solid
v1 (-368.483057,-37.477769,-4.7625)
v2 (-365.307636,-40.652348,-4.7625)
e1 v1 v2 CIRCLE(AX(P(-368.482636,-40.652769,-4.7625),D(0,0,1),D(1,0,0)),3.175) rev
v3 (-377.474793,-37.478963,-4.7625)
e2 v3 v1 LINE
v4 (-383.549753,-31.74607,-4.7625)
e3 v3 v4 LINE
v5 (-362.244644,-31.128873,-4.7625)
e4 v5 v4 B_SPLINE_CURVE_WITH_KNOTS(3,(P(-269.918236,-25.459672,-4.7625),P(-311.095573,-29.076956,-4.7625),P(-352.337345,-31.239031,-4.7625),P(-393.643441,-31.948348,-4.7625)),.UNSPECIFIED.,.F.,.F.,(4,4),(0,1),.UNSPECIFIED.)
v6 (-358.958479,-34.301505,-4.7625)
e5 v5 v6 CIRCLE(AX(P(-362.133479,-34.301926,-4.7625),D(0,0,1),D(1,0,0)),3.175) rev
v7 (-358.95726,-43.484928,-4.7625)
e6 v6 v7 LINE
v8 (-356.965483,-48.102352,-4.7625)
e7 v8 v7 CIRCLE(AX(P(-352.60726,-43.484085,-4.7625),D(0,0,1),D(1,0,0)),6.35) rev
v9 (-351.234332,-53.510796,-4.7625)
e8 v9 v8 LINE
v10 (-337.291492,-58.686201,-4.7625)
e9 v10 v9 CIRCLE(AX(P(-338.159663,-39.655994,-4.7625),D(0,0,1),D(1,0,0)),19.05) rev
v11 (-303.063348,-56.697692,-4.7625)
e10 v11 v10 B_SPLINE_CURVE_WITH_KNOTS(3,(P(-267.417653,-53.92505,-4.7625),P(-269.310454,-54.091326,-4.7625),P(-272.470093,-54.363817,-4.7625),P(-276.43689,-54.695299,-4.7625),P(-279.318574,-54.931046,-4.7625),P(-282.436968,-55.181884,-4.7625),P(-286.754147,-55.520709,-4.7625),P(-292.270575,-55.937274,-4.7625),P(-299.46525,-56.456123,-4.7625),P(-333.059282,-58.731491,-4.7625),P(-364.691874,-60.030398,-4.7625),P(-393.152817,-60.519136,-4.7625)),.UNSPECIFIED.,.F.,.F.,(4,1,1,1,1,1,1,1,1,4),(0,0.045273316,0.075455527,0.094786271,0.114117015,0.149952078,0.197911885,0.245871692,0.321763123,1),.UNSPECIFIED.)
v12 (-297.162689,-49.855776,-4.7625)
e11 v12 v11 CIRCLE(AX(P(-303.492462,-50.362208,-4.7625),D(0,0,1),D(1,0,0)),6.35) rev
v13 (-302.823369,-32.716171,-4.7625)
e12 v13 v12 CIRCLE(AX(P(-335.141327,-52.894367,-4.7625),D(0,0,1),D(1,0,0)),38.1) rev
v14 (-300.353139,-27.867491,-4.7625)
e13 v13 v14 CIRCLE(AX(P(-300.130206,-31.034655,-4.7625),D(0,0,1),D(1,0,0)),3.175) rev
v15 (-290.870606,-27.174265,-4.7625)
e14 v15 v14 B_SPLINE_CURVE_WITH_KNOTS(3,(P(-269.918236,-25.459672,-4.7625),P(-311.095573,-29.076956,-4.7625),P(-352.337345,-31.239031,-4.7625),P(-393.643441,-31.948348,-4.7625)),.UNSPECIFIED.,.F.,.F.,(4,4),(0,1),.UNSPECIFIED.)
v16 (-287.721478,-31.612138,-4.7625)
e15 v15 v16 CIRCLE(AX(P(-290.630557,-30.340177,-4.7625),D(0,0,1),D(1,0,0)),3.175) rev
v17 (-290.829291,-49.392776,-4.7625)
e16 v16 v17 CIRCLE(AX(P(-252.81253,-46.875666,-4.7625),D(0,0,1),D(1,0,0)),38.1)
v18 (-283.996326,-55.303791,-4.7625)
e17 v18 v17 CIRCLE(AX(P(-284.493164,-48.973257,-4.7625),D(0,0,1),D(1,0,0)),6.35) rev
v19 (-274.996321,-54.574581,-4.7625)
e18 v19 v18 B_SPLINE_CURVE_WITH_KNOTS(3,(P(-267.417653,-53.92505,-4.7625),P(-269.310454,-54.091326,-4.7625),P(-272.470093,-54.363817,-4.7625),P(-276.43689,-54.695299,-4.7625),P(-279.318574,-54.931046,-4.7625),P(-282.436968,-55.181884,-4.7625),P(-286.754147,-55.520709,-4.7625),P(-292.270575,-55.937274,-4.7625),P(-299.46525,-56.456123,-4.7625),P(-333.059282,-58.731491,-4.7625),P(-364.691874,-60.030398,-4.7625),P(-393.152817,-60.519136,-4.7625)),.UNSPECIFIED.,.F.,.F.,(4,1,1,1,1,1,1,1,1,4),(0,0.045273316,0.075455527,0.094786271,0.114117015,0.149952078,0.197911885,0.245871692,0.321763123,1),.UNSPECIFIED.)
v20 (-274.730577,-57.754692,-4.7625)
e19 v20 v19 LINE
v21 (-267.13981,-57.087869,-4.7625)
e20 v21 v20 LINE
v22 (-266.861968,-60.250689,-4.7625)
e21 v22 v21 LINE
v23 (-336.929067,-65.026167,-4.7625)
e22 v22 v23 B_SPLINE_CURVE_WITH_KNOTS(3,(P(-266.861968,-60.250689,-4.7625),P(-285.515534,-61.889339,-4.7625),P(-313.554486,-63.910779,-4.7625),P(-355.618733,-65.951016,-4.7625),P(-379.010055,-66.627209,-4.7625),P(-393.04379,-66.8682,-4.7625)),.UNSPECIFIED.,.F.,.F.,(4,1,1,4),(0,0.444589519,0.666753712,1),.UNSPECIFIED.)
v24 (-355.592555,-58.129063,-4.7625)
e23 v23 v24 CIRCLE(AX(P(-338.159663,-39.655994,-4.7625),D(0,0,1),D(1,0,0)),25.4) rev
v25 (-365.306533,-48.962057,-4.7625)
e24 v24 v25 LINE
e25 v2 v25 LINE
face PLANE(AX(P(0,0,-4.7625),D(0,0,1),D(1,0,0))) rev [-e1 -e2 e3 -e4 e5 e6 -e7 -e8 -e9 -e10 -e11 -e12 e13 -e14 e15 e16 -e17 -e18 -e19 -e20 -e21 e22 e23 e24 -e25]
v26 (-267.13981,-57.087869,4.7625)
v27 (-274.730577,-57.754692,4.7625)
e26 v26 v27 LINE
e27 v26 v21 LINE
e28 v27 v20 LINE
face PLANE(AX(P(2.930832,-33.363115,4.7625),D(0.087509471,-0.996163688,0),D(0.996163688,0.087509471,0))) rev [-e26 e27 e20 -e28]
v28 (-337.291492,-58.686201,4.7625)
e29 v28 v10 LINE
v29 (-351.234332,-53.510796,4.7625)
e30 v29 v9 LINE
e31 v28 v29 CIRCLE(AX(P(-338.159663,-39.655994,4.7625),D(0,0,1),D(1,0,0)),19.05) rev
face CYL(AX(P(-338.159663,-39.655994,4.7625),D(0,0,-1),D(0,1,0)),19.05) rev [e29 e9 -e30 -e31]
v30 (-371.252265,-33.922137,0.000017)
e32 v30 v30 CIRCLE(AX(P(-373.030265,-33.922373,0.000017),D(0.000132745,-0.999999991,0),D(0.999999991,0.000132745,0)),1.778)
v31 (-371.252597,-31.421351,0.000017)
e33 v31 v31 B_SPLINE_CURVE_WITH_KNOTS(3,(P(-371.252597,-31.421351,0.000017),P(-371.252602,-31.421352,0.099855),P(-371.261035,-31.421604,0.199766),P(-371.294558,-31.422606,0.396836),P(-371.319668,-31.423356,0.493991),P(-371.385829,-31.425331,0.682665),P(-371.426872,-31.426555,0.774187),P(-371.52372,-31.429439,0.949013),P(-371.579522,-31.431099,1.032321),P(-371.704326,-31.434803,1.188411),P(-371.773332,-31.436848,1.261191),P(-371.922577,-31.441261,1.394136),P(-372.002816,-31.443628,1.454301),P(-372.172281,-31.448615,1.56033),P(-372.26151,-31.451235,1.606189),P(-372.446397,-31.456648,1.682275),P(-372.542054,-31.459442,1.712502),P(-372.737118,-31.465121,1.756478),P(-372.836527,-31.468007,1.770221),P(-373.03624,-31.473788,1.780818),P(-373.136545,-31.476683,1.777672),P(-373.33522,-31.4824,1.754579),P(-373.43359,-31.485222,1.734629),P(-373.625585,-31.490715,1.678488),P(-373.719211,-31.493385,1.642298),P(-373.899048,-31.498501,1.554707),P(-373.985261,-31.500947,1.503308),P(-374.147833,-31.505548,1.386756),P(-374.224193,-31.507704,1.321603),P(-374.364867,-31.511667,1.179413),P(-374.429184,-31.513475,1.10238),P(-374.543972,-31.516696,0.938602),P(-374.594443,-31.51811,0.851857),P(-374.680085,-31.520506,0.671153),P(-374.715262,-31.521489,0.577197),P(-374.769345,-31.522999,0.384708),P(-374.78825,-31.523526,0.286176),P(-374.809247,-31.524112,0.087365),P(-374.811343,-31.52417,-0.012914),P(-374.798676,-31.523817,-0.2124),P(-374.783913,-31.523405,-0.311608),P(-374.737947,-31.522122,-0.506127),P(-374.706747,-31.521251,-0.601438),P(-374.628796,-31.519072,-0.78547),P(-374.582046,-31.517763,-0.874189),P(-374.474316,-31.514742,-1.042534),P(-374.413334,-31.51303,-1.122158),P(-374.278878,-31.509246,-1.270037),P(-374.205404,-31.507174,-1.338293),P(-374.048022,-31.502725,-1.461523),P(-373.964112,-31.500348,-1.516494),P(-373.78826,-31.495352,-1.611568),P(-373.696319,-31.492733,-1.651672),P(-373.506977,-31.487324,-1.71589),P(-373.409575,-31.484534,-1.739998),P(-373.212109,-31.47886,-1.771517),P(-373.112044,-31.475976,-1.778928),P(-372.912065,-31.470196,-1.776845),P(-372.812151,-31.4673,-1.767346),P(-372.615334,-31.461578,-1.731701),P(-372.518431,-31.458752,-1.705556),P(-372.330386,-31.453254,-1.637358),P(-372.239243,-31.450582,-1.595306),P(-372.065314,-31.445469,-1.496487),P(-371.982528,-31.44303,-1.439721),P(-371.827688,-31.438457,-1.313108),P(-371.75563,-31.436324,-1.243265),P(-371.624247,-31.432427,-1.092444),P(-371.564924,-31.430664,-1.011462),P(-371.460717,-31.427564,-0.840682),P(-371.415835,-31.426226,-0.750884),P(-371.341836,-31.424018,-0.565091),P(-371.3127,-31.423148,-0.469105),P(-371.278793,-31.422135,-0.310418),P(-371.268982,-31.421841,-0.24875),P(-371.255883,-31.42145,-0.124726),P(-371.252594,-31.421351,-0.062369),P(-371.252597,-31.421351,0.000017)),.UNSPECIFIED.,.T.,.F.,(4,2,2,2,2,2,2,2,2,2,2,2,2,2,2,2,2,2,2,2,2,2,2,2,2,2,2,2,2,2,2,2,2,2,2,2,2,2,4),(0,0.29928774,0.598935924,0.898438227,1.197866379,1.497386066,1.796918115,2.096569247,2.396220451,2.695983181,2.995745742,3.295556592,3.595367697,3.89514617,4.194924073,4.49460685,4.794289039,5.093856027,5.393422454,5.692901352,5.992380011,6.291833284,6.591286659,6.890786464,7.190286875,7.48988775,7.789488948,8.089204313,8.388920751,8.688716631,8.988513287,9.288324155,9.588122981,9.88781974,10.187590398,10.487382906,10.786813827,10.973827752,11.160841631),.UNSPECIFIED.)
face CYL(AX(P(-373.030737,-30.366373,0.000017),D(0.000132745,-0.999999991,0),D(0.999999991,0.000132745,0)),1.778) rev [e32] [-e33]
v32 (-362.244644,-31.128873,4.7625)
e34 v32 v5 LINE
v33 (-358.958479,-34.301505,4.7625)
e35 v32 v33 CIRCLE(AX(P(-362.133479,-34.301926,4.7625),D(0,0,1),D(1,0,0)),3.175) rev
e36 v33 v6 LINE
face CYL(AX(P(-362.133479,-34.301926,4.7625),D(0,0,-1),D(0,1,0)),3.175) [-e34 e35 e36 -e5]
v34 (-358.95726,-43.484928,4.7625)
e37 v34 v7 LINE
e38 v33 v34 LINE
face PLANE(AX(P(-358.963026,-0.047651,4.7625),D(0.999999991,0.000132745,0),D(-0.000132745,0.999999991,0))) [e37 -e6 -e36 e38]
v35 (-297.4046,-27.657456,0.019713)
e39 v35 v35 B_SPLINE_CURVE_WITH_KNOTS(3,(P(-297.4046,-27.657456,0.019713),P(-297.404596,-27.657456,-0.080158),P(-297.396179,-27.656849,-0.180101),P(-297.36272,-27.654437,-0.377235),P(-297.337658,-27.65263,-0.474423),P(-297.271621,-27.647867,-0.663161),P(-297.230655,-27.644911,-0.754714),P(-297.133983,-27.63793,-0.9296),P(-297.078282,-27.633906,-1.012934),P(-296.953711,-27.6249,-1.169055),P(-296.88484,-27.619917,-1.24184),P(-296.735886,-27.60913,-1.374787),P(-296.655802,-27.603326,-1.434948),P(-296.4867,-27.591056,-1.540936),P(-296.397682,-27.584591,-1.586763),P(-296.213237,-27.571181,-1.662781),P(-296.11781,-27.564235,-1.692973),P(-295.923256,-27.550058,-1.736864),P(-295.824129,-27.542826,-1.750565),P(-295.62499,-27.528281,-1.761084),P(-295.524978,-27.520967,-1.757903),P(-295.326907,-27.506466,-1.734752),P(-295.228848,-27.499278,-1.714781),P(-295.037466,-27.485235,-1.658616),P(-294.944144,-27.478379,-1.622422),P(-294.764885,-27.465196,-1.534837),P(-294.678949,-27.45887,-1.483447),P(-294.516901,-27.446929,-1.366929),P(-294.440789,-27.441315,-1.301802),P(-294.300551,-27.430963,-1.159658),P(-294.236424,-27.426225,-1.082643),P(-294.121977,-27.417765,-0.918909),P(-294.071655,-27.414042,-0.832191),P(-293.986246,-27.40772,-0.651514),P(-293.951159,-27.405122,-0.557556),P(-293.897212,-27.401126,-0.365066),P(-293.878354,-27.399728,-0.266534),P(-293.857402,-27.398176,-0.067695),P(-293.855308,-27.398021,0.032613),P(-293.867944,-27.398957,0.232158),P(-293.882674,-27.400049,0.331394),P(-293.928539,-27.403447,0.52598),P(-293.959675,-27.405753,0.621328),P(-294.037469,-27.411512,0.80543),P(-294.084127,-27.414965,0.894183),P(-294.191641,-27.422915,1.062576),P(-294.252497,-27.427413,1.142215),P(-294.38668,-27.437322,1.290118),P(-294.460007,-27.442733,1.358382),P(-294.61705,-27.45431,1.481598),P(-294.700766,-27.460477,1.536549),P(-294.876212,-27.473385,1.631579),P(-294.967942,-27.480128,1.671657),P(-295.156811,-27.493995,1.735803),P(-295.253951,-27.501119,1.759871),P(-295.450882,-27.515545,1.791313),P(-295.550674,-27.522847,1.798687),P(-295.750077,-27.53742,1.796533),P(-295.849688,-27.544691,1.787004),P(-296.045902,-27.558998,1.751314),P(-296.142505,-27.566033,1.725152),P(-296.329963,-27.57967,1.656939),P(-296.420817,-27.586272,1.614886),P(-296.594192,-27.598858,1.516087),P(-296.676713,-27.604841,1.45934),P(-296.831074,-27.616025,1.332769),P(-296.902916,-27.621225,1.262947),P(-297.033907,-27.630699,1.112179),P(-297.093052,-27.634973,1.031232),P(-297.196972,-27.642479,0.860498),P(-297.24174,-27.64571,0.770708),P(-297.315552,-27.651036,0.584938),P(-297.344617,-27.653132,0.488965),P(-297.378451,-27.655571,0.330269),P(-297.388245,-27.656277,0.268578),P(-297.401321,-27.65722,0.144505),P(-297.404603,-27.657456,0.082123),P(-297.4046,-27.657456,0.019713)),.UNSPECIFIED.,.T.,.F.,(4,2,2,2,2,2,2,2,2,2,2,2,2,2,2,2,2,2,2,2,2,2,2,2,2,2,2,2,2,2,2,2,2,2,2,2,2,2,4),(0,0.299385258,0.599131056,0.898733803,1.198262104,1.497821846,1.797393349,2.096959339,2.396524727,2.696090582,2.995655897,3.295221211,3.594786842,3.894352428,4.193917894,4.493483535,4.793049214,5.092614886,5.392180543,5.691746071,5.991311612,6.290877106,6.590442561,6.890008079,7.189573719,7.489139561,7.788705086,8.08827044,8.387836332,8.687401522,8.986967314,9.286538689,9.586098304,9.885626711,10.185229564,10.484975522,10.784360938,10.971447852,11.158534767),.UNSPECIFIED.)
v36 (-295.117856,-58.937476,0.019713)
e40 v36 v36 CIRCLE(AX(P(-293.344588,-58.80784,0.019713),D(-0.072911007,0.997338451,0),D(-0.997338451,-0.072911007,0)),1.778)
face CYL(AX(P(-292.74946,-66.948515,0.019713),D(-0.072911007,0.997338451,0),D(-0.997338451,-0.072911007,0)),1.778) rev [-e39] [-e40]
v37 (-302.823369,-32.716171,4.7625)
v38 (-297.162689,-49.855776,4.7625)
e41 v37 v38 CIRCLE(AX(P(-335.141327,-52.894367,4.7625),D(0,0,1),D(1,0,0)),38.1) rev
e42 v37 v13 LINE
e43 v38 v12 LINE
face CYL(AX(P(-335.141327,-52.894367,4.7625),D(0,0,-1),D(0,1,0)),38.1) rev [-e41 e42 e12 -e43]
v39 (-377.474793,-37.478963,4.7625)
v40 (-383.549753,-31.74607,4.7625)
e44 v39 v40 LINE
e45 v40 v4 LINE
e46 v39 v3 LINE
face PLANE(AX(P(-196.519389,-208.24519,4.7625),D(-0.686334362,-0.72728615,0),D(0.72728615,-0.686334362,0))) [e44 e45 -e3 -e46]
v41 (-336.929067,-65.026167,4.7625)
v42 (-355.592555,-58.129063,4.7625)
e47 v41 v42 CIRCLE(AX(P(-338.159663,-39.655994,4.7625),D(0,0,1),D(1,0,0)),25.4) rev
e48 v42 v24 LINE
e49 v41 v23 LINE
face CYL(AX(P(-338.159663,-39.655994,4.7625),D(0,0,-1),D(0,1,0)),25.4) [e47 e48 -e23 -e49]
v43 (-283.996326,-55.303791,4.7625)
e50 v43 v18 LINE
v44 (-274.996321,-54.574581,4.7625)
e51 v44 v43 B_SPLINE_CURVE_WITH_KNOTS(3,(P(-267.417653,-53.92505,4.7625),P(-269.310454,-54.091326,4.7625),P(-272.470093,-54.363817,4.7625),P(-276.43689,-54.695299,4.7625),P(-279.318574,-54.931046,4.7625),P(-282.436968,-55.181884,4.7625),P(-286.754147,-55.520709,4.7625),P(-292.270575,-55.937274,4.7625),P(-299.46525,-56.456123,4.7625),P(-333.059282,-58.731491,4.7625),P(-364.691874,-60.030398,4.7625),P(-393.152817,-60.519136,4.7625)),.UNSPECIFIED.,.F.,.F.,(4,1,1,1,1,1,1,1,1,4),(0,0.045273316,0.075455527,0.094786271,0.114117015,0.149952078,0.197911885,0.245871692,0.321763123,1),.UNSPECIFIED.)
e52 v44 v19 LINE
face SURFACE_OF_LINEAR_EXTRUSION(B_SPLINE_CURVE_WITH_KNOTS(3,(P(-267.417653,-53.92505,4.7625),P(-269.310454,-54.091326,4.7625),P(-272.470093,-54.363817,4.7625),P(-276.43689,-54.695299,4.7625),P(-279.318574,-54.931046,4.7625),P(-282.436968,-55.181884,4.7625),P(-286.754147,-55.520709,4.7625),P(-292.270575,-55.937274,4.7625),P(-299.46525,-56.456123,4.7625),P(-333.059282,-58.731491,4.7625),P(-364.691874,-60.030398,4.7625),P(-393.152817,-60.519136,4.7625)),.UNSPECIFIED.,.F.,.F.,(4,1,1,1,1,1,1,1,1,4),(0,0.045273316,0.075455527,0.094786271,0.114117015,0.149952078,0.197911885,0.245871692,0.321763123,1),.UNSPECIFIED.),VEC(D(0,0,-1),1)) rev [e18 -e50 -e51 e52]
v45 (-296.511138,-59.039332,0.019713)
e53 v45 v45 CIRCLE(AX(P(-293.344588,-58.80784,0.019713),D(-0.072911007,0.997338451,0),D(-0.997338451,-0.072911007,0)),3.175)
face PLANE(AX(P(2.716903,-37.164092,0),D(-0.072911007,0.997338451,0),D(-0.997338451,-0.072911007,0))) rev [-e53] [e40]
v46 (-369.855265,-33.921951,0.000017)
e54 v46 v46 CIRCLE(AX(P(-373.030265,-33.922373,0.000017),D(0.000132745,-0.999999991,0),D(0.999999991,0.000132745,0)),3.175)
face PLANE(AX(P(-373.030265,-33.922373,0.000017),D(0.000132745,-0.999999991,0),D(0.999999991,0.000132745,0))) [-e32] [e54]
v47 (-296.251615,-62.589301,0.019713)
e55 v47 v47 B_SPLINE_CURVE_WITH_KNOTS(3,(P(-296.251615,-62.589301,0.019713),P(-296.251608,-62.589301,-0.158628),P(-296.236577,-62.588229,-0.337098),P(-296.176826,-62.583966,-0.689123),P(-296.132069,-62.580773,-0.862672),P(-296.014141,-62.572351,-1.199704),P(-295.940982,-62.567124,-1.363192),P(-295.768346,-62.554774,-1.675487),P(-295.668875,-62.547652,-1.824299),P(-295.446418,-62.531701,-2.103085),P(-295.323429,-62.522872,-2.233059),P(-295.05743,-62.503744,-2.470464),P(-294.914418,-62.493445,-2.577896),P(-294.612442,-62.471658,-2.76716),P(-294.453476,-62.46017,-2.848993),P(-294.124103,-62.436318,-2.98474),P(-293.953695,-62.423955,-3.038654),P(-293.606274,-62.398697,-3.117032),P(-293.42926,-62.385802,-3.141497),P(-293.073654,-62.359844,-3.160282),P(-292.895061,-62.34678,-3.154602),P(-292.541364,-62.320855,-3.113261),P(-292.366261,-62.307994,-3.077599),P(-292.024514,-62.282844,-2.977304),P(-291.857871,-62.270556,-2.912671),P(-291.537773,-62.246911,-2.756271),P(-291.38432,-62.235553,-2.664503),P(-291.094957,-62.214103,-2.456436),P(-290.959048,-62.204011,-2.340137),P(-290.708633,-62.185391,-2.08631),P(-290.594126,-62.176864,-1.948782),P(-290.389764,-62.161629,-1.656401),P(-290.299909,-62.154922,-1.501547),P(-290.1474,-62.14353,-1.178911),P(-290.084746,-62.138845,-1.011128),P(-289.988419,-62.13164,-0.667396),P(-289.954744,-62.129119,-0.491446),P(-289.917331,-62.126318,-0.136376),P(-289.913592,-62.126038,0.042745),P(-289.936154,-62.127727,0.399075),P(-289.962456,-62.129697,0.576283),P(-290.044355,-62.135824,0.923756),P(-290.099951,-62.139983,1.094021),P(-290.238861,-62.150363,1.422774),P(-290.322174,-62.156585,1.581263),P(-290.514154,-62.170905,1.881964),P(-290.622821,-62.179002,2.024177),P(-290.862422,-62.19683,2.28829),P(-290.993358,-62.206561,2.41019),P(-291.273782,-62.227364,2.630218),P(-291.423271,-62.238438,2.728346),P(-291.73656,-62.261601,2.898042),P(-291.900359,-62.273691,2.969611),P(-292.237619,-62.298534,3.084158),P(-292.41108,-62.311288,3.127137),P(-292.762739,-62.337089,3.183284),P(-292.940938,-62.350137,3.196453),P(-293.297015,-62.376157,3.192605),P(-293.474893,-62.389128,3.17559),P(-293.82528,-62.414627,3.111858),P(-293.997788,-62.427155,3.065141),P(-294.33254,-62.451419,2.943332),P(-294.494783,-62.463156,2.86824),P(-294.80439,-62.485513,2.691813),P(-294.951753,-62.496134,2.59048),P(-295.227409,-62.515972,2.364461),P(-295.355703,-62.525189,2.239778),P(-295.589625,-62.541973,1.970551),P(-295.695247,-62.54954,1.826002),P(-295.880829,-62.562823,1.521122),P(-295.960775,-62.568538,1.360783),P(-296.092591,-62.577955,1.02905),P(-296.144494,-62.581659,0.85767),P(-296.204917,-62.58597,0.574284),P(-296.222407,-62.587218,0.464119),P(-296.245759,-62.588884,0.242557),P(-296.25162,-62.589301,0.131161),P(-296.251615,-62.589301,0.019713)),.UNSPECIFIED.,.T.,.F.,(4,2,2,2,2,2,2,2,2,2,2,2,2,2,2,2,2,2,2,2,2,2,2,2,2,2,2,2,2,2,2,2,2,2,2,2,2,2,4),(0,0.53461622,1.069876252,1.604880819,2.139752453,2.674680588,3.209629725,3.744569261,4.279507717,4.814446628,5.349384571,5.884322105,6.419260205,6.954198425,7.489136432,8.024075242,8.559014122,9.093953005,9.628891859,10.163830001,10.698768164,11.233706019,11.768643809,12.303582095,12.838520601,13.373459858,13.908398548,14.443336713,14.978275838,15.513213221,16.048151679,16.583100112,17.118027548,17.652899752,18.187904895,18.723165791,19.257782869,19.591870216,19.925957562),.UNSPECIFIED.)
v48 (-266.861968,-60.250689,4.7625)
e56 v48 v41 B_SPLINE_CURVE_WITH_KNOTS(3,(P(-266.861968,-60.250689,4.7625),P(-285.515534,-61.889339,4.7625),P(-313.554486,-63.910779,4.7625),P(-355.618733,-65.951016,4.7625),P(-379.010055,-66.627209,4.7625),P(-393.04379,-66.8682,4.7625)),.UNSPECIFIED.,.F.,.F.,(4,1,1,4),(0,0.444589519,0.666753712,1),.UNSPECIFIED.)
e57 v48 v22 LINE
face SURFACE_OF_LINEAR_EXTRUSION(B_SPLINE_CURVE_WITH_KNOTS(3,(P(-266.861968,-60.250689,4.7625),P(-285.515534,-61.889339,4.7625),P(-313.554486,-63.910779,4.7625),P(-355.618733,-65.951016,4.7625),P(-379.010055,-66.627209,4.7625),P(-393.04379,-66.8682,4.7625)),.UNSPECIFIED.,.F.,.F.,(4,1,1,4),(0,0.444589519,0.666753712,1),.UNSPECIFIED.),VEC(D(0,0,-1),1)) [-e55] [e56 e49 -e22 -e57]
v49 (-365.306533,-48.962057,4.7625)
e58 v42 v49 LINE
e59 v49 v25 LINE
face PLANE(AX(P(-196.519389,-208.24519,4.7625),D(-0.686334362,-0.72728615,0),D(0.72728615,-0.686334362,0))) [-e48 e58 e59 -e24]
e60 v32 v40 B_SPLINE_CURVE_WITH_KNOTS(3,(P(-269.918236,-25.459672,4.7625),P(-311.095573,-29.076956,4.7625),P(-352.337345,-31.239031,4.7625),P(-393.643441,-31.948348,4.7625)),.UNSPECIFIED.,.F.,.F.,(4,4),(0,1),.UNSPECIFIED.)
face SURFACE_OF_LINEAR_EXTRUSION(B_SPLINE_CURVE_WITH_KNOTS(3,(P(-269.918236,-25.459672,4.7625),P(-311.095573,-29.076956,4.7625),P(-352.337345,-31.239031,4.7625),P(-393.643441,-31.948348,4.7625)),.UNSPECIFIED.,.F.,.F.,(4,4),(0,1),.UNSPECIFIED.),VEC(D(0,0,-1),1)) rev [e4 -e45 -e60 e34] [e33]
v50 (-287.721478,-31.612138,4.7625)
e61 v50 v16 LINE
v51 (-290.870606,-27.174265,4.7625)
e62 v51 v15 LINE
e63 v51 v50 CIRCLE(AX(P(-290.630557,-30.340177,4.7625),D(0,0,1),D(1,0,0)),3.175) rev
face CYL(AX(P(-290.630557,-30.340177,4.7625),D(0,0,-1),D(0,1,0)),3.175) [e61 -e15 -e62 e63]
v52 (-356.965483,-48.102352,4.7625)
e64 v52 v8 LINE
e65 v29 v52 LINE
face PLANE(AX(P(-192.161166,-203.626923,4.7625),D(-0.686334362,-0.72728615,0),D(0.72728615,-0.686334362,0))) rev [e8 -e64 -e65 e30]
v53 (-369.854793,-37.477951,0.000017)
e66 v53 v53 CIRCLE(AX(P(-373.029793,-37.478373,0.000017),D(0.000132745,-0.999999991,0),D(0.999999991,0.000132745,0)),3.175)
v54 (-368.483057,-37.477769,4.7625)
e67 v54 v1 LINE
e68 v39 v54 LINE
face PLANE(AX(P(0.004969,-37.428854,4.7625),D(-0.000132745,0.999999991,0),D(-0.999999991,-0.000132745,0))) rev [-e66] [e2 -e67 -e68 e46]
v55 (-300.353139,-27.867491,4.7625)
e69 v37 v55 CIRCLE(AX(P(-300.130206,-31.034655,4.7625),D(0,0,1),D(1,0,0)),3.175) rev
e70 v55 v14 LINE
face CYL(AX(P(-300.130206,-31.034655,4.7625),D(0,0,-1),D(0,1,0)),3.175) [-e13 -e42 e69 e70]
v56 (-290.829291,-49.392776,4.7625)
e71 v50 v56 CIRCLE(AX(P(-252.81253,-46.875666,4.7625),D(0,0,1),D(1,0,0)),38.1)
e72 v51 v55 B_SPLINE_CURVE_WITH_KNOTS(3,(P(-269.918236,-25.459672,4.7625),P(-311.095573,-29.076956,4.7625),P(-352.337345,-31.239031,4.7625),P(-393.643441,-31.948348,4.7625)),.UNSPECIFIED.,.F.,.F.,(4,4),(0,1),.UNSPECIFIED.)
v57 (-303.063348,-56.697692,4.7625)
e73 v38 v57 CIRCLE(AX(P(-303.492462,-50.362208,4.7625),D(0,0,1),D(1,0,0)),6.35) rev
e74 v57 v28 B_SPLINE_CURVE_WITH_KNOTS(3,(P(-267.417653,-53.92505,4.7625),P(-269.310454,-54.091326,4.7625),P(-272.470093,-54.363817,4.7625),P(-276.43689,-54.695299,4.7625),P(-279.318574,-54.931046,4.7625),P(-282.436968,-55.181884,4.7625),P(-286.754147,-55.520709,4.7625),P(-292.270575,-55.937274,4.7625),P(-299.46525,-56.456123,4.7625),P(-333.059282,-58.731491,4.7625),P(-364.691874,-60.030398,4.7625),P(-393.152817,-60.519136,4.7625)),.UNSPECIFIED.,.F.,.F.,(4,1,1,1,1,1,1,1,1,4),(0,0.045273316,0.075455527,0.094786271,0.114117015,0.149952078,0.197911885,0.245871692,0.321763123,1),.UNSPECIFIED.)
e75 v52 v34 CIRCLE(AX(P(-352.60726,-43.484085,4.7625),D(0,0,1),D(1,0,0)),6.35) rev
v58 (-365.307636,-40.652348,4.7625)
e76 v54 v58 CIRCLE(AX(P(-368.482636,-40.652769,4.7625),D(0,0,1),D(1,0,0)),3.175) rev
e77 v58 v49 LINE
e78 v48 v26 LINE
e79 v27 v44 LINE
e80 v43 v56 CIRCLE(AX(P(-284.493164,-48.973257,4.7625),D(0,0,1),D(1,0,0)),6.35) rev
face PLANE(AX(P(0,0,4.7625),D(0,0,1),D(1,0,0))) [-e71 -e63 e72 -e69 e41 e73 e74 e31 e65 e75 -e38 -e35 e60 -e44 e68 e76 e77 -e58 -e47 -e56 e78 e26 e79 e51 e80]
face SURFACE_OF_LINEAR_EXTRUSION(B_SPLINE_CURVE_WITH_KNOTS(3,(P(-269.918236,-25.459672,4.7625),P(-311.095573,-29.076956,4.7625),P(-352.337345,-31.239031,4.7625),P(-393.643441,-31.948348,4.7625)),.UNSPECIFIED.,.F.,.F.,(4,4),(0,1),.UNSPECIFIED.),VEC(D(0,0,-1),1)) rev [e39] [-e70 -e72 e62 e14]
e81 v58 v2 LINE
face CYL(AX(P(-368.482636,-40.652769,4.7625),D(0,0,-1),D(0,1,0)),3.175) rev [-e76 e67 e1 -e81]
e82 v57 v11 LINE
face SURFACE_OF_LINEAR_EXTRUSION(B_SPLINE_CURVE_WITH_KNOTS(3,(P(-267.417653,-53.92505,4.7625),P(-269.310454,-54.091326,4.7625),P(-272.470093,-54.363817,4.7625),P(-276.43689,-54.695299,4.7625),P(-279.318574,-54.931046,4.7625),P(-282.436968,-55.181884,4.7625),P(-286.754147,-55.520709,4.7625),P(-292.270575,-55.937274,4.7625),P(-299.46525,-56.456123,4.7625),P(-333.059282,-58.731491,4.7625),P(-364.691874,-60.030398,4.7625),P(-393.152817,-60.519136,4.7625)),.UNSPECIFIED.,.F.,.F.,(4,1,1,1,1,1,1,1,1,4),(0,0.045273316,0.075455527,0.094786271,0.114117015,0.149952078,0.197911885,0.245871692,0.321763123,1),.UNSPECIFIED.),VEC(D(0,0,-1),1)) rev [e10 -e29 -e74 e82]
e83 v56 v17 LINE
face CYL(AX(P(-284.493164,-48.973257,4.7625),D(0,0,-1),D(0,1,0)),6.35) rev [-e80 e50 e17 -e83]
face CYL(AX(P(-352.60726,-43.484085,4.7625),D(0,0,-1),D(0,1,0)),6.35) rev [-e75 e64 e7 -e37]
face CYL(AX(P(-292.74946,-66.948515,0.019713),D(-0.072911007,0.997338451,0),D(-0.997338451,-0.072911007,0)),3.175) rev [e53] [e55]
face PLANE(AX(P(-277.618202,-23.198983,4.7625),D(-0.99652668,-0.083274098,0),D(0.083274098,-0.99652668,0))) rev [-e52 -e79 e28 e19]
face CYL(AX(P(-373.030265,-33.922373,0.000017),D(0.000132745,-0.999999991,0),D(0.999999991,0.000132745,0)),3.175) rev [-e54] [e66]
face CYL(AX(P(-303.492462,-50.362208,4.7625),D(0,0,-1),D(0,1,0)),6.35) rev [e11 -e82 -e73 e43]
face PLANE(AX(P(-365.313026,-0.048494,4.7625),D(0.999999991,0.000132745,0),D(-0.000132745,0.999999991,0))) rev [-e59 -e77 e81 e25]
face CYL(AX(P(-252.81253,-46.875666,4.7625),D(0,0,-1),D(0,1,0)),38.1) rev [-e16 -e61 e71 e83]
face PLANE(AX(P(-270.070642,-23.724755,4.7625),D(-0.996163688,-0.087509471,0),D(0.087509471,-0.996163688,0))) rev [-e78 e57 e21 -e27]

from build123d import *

# Parameters (mm, degrees)
BOSS_EXTRUDE1_START     = -4.7625
BOSS_EXTRUDE1_DEPTH     = 9.525
SKETCH4_R               = 3.175
CUT_EXTRUDE1_DEPTH      = 3.556
SKETCH5_R               = 1.778
CUT_EXTRUDE2_DEPTH      = 3.556
SKETCH6_R               = 1.778
CUT_EXTRUDE3_DEPTH      = 389.542033304
CUT_EXTRUDE4_DEPTH      = 3.556
CUT_EXTRUDE4_DEPTH_BACK = 388.321146479
SKETCH7_R               = 3.175
SKETCH7_R_2             = 1.778


# Read off the part's stored shape, not the designer's step: Boss-Extrude1
with BuildPart() as part:
    # Boss-Extrude1 outline → Boss-Extrude1 (new body)
    with BuildSketch(Plane(origin=(-0.151105159, 1.836314253, 0), x_dir=(-0.9999999911893379, -0.00013274533532885028, 0), z_dir=(0, 0, -1)).offset(BOSS_EXTRUDE1_START)):
        with BuildLine():
            add(Edge.make_bspline(
                [(266.719101765, -62.051598198), (285.372886056, -63.687772151), (308.740732669, -65.369335536), (332.113756278, -66.591725825), (336.786834388, -66.817774574)],
                knots=[0, 0, 0, 0, 0.444589519, 0.555671616, 0.555671616, 0.555671616, 0.555671616], degree=3))
            ThreePointArc((336.786834388, -66.817774574), (346.821832777, -65.271443631), (355.449407296, -59.918193219))
            Line((355.449407296, -59.918193219), (365.162167793, -50.749897782))
            Line((365.162167793, -50.749897782), (365.162167793, -42.440188824))
            ThreePointArc((365.162167793, -42.440188824), (366.092103763, -40.195124794), (368.337167793, -39.265188824))
            Line((368.337167793, -39.265188824), (377.328903503, -39.265188824))
            Line((377.328903503, -39.265188824), (383.403102119, -33.531489588))
            add(Edge.make_bspline(
                [(362.097911235, -32.917120768), (369.197743206, -33.164912437), (376.299473684, -33.369697882), (383.403102119, -33.531489588)],
                knots=[0.746516847, 0.746516847, 0.746516847, 0.746516847, 0.918535276, 0.918535276, 0.918535276, 0.918535276], degree=3))
            ThreePointArc((362.097911235, -32.917120768), (359.781604988, -33.806306666), (358.812167793, -36.090188824))
            Line((358.812167793, -36.090188824), (358.812167793, -45.273612359))
            ThreePointArc((358.812167793, -45.273612359), (358.293167277, -47.787960192), (356.821004007, -49.891300836))
            Line((356.821004007, -49.891300836), (351.090571083, -55.300504742))
            ThreePointArc((351.090571083, -55.300504742), (344.645600305, -59.305916448), (337.148417456, -60.4777614))
            add(Edge.make_bspline(
                [(302.92001028, -58.493795672), (304.509330321, -58.60122978), (315.913868956, -59.356827875), (327.324554644, -60.002877801), (337.148417456, -60.4777614)],
                knots=[0.283817359, 0.283817359, 0.283817359, 0.283817359, 0.321763123, 0.556088201, 0.556088201, 0.556088201, 0.556088201], degree=3))
            ThreePointArc((302.92001028, -58.493795672), (298.540134178, -56.306049329), (297.01844307, -51.652662937))
            ThreePointArc((297.01844307, -51.652662937), (298.817944258, -42.742557946), (302.676848033, -34.512306606))
            ThreePointArc((302.676848033, -34.512306606), (302.812285866, -31.389489502), (300.205974442, -29.663954561))
            add(Edge.make_bspline(
                [(290.723349608, -28.971987248), (293.88384664, -29.211203734), (297.044721601, -29.441859136), (300.205974442, -29.663954561)],
                knots=[0.169565869, 0.169565869, 0.169565869, 0.169565869, 0.246277706, 0.246277706, 0.246277706, 0.246277706], degree=3))
            ThreePointArc((290.723349608, -28.971987248), (287.894150829, -30.300881632), (287.574810624, -33.410278334))
            ThreePointArc((287.574810624, -33.410278334), (290.198038966, -42.113548005), (290.684983891, -51.190503181))
            ThreePointArc((290.684983891, -51.190503181), (288.503875799, -55.573685628), (283.852803221, -57.102425178))
            add(Edge.make_bspline(
                [(274.852701957, -56.374410111), (275.484326416, -56.427106964), (276.92498218, -56.546530571), (279.175001885, -56.730301658), (281.5434013, -56.92049496), (283.102708442, -57.04365577), (283.852803221, -57.102425178)],
                knots=[0.060364421, 0.060364421, 0.060364421, 0.060364421, 0.075455527, 0.094786271, 0.114117015, 0.132034547, 0.132034547, 0.132034547, 0.132034547], degree=3))
            Line((274.852701957, -56.374410111), (274.587380233, -59.554556157))
            Line((274.587380233, -59.554556157), (266.996524483, -58.888741635))
            Line((266.996524483, -58.888741635), (266.719101765, -62.051598198))
        make_face()
    extrude(amount=BOSS_EXTRUDE1_DEPTH)

    # Sketch4 → Cut-Extrude1 (cut)
    with BuildSketch(Plane(origin=(0.004968506, -37.428854199, 0), x_dir=(-0.999999991182225, -0.00013274533532793586, -3.771739900033909e-06), z_dir=(0.00013274533532888006, -0.999999991189338, 0))):
        with Locations(Location((373.034764896, -0.001423755, 0), (0, 0, 179.999783895))):
            Circle(SKETCH4_R)
    extrude(amount=-CUT_EXTRUDE1_DEPTH, mode=Mode.SUBTRACT)

    # Sketch5 → Cut-Extrude2 (cut)
    with BuildSketch(Plane(origin=(0.004496463, -33.872854231, 0), x_dir=(-0.999999991182225, -0.00013274533532793586, -3.771739900033909e-06), z_dir=(0.00013274533532888006, -0.9999999911893379, 0))):
        with Locations(Location((373.034764896, -0.001423755, 0), (0, 0, 179.999783895))):
            Circle(SKETCH5_R)
    extrude(amount=-CUT_EXTRUDE2_DEPTH, mode=Mode.SUBTRACT)

    # Sketch6 → Cut-Extrude3 (cut, through all)
    with BuildSketch(Plane(origin=(0.429757188, -5.878582453, 0), x_dir=(0.9973298035047504, 0.0729103752016881, 0.004164160074363476), z_dir=(-0.07291100735121511, 0.9973384505808602, 0))):
        with Locations(Location((-296.848920319, -1.255850637, 0), (0, 0, 180.238589487))):
            Circle(SKETCH6_R)
    extrude(amount=-CUT_EXTRUDE3_DEPTH, mode=Mode.SUBTRACT)

    # Sketch7 → Cut-Extrude4 (cut, two sides: drawn at the far end of the back side and taken through both)
    with BuildSketch(Plane(origin=(2.97617412, -40.71062784, 0), x_dir=(0.9973298035047504, 0.0729103752016881, 0.004164160074363476), z_dir=(-0.07291100735121511, 0.9973384505808603, 0)).offset(-CUT_EXTRUDE4_DEPTH_BACK)):
        with Locations(Location((-296.848920319, -1.255850637, 0), (0, 0, 180.238589487))):
            Circle(SKETCH7_R)
        with Locations(Location((-296.848920319, -1.255850637, 0), (0, 0, 180.238589487))):
            Circle(SKETCH7_R_2, mode=Mode.SUBTRACT)
    extrude(amount=CUT_EXTRUDE4_DEPTH + CUT_EXTRUDE4_DEPTH_BACK, mode=Mode.SUBTRACT)


solid = part.part
